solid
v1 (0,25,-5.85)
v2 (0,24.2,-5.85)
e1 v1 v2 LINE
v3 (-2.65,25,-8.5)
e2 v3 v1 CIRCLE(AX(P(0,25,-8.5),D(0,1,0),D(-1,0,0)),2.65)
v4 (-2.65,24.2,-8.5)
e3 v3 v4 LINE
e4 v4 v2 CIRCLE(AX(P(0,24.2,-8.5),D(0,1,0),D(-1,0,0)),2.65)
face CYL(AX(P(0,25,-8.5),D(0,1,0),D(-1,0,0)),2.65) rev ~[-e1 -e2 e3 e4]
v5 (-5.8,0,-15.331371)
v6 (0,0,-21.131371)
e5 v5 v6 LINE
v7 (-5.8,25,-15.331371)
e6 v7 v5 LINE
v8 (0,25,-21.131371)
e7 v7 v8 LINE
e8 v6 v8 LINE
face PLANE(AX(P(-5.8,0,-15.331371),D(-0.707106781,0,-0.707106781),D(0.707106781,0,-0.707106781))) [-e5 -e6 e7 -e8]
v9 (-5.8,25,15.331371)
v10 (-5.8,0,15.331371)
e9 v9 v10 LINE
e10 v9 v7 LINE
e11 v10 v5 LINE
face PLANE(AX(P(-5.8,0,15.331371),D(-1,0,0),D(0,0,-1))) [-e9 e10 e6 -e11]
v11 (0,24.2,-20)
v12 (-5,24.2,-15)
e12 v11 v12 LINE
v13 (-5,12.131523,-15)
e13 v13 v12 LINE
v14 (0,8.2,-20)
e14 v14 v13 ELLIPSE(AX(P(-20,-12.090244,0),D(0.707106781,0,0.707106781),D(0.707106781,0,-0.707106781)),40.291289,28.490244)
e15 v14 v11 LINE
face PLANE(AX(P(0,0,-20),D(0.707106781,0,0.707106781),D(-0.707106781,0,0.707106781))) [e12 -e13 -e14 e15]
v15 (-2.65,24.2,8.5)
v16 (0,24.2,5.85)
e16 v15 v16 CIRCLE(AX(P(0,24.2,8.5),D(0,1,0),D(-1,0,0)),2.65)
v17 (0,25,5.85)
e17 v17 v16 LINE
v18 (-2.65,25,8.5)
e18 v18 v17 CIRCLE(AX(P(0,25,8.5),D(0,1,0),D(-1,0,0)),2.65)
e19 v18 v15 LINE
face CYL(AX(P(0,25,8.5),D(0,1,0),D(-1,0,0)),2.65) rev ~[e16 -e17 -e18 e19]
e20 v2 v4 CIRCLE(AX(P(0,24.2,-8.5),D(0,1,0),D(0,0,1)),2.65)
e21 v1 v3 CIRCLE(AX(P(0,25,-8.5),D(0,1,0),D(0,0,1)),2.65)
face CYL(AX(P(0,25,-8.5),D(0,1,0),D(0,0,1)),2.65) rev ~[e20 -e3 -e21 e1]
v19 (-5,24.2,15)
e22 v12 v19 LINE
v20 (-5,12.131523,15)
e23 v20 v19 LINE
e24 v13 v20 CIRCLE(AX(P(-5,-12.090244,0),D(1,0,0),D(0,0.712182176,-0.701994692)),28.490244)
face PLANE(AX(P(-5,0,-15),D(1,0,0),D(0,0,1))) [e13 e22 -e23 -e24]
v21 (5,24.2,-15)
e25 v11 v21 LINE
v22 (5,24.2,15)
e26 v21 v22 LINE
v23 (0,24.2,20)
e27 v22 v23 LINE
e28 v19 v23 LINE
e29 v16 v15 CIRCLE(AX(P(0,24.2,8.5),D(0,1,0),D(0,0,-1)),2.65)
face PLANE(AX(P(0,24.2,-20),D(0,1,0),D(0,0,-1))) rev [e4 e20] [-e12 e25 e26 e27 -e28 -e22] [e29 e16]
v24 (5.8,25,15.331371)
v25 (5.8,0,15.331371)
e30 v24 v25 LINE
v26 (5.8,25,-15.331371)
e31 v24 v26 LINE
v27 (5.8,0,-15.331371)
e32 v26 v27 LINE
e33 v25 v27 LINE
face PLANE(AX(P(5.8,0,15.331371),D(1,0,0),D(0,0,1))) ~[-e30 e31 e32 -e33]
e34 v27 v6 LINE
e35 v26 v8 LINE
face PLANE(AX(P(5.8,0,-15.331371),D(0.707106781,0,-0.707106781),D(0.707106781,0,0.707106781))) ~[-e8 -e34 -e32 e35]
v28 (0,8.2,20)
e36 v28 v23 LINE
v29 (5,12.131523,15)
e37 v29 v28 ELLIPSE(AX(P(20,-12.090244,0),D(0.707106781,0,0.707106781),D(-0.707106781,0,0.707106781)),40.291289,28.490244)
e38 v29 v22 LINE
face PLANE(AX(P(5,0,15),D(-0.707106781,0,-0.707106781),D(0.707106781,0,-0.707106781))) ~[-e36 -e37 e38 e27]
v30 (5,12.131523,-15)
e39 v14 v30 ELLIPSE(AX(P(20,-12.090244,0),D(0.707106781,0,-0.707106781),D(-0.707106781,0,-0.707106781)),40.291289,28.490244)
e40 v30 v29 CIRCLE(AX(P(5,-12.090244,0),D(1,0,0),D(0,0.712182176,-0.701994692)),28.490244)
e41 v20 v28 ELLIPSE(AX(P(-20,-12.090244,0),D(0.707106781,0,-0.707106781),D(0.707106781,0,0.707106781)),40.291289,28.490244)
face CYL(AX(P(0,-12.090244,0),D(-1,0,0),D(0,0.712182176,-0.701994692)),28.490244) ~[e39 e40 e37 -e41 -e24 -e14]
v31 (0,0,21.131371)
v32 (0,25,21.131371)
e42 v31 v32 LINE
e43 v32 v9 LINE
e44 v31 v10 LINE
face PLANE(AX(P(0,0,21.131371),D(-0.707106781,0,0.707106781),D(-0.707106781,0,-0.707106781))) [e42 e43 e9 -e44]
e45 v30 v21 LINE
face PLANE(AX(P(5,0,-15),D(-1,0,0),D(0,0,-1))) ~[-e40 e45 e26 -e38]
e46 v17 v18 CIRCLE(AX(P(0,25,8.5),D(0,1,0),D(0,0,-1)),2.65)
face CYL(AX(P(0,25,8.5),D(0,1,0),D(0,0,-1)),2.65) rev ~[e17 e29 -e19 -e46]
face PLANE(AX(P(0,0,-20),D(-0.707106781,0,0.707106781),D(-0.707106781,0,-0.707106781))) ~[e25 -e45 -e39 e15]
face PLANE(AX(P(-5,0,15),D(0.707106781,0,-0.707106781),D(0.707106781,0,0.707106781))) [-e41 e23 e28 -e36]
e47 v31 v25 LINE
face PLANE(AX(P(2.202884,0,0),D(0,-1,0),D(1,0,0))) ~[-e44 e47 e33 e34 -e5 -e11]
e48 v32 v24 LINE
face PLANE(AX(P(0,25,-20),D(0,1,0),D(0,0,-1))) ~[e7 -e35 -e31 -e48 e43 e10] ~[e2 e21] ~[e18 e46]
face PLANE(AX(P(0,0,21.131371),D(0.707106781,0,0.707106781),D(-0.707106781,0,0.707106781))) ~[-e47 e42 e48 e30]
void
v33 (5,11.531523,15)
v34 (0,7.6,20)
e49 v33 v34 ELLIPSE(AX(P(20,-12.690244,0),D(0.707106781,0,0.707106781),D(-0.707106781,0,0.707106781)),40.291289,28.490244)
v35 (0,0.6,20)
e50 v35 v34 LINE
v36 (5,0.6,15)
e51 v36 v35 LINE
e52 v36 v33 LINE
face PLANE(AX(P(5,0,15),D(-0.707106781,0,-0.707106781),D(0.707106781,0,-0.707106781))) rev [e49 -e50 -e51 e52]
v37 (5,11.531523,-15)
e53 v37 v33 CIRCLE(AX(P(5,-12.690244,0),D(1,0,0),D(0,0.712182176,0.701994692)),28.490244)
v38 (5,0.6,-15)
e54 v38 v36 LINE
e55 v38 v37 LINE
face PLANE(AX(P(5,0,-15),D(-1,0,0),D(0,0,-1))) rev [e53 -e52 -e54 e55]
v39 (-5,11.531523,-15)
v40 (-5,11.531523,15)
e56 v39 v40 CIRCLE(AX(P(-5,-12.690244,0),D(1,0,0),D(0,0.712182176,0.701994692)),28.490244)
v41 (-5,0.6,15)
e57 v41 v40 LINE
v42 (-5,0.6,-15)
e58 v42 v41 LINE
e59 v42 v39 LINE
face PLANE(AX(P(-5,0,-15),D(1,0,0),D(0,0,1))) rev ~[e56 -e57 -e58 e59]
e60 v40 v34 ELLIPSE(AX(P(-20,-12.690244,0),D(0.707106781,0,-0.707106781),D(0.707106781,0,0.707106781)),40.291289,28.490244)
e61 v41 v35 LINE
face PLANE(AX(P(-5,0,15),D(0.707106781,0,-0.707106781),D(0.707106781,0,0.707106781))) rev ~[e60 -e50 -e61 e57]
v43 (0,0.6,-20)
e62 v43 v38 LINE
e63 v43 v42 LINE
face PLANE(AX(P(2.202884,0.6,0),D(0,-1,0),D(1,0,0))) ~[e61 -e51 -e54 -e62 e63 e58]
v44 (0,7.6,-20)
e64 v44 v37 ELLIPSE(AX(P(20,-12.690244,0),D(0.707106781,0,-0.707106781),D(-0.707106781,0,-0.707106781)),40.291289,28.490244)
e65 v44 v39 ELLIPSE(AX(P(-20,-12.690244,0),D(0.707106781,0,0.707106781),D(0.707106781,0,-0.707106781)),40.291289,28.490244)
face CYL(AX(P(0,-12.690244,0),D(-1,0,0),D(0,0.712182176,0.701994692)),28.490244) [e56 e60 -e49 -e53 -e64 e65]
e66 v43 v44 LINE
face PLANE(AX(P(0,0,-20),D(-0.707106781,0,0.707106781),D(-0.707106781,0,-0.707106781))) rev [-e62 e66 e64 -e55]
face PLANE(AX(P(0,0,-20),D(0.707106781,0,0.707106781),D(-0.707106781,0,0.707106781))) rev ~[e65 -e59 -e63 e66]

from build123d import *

# Parameters (mm, degrees)
F1_DEPTH = 0.6
F2_DEPTH = 25
F3_W     = 0.8
F3_H     = 40
F7_DEPTH = 2


with BuildPart() as f1:
    # F0 (on Front) → F1 (new body)
    with BuildSketch(Plane.XZ):
        Polygon((0, -20), (0, 20), (-5, 15), (-5, -15), align=None)
        Polygon((-5, 15), (0, 20), (0, 21.1313708499), (-5.8, 15.3313708499), (-5.8, -15.3313708499), (0, -21.1313708499), (0, -20), (-5, -15), align=None)
    extrude(amount=-F1_DEPTH)

    # F0 (on Front) → F2 (join)
    with BuildSketch(Plane.XZ):
        Polygon((-5, 15), (0, 20), (0, 21.1313708499), (-5.8, 15.3313708499), (-5.8, -15.3313708499), (0, -21.1313708499), (0, -20), (-5, -15), align=None)
    extrude(amount=-F2_DEPTH)

    # F3 (on face) → F4 (join, up to the next surface of F1)
    with BuildSketch(Plane.YZ):
        with Locations((24.6, 0)):
            Rectangle(F3_W, F3_H)
        with BuildLine():
            ThreePointArc((8.2, -20), (16.4, 0), (8.2, 20))
            Line((8.2, 20), (7.6, 20))
            ThreePointArc((7.6, 20), (15.8, 0), (7.6, -20))
            Line((7.6, -20), (8.2, -20))
        make_face()
    extrude(until=Until.NEXT, dir=(-1, 0, 0))

    # F5: F1 across face


with BuildPart() as f1_1:
    add(f1.part)
    add(f1.part.mirror(Plane(origin=(0, 13.3750956502, 0), x_dir=(0, 1, 0), z_dir=(1, 0, 0))))

    # F6 (on face) → F7 (cut)
    with BuildSketch(Plane(origin=(0, 25, 0), x_dir=(-1, 0, 0), z_dir=(0, 1, 0))):
        with BuildLine():
            ThreePointArc((2.65, 8.5), (-1.8738329701, 10.3738329701), (0, 5.85))
            ThreePointArc((0, 5.85), (1.8738329701, 6.6261670299), (2.65, 8.5))
        make_face()
        with BuildLine():
            ThreePointArc((2.65, -8.5), (1.8738329701, -6.6261670299), (0, -5.85))
            ThreePointArc((0, -5.85), (-1.8738329701, -10.3738329701), (2.65, -8.5))
        make_face()
    extrude(amount=-F7_DEPTH, mode=Mode.SUBTRACT)


solid = f1_1.part
